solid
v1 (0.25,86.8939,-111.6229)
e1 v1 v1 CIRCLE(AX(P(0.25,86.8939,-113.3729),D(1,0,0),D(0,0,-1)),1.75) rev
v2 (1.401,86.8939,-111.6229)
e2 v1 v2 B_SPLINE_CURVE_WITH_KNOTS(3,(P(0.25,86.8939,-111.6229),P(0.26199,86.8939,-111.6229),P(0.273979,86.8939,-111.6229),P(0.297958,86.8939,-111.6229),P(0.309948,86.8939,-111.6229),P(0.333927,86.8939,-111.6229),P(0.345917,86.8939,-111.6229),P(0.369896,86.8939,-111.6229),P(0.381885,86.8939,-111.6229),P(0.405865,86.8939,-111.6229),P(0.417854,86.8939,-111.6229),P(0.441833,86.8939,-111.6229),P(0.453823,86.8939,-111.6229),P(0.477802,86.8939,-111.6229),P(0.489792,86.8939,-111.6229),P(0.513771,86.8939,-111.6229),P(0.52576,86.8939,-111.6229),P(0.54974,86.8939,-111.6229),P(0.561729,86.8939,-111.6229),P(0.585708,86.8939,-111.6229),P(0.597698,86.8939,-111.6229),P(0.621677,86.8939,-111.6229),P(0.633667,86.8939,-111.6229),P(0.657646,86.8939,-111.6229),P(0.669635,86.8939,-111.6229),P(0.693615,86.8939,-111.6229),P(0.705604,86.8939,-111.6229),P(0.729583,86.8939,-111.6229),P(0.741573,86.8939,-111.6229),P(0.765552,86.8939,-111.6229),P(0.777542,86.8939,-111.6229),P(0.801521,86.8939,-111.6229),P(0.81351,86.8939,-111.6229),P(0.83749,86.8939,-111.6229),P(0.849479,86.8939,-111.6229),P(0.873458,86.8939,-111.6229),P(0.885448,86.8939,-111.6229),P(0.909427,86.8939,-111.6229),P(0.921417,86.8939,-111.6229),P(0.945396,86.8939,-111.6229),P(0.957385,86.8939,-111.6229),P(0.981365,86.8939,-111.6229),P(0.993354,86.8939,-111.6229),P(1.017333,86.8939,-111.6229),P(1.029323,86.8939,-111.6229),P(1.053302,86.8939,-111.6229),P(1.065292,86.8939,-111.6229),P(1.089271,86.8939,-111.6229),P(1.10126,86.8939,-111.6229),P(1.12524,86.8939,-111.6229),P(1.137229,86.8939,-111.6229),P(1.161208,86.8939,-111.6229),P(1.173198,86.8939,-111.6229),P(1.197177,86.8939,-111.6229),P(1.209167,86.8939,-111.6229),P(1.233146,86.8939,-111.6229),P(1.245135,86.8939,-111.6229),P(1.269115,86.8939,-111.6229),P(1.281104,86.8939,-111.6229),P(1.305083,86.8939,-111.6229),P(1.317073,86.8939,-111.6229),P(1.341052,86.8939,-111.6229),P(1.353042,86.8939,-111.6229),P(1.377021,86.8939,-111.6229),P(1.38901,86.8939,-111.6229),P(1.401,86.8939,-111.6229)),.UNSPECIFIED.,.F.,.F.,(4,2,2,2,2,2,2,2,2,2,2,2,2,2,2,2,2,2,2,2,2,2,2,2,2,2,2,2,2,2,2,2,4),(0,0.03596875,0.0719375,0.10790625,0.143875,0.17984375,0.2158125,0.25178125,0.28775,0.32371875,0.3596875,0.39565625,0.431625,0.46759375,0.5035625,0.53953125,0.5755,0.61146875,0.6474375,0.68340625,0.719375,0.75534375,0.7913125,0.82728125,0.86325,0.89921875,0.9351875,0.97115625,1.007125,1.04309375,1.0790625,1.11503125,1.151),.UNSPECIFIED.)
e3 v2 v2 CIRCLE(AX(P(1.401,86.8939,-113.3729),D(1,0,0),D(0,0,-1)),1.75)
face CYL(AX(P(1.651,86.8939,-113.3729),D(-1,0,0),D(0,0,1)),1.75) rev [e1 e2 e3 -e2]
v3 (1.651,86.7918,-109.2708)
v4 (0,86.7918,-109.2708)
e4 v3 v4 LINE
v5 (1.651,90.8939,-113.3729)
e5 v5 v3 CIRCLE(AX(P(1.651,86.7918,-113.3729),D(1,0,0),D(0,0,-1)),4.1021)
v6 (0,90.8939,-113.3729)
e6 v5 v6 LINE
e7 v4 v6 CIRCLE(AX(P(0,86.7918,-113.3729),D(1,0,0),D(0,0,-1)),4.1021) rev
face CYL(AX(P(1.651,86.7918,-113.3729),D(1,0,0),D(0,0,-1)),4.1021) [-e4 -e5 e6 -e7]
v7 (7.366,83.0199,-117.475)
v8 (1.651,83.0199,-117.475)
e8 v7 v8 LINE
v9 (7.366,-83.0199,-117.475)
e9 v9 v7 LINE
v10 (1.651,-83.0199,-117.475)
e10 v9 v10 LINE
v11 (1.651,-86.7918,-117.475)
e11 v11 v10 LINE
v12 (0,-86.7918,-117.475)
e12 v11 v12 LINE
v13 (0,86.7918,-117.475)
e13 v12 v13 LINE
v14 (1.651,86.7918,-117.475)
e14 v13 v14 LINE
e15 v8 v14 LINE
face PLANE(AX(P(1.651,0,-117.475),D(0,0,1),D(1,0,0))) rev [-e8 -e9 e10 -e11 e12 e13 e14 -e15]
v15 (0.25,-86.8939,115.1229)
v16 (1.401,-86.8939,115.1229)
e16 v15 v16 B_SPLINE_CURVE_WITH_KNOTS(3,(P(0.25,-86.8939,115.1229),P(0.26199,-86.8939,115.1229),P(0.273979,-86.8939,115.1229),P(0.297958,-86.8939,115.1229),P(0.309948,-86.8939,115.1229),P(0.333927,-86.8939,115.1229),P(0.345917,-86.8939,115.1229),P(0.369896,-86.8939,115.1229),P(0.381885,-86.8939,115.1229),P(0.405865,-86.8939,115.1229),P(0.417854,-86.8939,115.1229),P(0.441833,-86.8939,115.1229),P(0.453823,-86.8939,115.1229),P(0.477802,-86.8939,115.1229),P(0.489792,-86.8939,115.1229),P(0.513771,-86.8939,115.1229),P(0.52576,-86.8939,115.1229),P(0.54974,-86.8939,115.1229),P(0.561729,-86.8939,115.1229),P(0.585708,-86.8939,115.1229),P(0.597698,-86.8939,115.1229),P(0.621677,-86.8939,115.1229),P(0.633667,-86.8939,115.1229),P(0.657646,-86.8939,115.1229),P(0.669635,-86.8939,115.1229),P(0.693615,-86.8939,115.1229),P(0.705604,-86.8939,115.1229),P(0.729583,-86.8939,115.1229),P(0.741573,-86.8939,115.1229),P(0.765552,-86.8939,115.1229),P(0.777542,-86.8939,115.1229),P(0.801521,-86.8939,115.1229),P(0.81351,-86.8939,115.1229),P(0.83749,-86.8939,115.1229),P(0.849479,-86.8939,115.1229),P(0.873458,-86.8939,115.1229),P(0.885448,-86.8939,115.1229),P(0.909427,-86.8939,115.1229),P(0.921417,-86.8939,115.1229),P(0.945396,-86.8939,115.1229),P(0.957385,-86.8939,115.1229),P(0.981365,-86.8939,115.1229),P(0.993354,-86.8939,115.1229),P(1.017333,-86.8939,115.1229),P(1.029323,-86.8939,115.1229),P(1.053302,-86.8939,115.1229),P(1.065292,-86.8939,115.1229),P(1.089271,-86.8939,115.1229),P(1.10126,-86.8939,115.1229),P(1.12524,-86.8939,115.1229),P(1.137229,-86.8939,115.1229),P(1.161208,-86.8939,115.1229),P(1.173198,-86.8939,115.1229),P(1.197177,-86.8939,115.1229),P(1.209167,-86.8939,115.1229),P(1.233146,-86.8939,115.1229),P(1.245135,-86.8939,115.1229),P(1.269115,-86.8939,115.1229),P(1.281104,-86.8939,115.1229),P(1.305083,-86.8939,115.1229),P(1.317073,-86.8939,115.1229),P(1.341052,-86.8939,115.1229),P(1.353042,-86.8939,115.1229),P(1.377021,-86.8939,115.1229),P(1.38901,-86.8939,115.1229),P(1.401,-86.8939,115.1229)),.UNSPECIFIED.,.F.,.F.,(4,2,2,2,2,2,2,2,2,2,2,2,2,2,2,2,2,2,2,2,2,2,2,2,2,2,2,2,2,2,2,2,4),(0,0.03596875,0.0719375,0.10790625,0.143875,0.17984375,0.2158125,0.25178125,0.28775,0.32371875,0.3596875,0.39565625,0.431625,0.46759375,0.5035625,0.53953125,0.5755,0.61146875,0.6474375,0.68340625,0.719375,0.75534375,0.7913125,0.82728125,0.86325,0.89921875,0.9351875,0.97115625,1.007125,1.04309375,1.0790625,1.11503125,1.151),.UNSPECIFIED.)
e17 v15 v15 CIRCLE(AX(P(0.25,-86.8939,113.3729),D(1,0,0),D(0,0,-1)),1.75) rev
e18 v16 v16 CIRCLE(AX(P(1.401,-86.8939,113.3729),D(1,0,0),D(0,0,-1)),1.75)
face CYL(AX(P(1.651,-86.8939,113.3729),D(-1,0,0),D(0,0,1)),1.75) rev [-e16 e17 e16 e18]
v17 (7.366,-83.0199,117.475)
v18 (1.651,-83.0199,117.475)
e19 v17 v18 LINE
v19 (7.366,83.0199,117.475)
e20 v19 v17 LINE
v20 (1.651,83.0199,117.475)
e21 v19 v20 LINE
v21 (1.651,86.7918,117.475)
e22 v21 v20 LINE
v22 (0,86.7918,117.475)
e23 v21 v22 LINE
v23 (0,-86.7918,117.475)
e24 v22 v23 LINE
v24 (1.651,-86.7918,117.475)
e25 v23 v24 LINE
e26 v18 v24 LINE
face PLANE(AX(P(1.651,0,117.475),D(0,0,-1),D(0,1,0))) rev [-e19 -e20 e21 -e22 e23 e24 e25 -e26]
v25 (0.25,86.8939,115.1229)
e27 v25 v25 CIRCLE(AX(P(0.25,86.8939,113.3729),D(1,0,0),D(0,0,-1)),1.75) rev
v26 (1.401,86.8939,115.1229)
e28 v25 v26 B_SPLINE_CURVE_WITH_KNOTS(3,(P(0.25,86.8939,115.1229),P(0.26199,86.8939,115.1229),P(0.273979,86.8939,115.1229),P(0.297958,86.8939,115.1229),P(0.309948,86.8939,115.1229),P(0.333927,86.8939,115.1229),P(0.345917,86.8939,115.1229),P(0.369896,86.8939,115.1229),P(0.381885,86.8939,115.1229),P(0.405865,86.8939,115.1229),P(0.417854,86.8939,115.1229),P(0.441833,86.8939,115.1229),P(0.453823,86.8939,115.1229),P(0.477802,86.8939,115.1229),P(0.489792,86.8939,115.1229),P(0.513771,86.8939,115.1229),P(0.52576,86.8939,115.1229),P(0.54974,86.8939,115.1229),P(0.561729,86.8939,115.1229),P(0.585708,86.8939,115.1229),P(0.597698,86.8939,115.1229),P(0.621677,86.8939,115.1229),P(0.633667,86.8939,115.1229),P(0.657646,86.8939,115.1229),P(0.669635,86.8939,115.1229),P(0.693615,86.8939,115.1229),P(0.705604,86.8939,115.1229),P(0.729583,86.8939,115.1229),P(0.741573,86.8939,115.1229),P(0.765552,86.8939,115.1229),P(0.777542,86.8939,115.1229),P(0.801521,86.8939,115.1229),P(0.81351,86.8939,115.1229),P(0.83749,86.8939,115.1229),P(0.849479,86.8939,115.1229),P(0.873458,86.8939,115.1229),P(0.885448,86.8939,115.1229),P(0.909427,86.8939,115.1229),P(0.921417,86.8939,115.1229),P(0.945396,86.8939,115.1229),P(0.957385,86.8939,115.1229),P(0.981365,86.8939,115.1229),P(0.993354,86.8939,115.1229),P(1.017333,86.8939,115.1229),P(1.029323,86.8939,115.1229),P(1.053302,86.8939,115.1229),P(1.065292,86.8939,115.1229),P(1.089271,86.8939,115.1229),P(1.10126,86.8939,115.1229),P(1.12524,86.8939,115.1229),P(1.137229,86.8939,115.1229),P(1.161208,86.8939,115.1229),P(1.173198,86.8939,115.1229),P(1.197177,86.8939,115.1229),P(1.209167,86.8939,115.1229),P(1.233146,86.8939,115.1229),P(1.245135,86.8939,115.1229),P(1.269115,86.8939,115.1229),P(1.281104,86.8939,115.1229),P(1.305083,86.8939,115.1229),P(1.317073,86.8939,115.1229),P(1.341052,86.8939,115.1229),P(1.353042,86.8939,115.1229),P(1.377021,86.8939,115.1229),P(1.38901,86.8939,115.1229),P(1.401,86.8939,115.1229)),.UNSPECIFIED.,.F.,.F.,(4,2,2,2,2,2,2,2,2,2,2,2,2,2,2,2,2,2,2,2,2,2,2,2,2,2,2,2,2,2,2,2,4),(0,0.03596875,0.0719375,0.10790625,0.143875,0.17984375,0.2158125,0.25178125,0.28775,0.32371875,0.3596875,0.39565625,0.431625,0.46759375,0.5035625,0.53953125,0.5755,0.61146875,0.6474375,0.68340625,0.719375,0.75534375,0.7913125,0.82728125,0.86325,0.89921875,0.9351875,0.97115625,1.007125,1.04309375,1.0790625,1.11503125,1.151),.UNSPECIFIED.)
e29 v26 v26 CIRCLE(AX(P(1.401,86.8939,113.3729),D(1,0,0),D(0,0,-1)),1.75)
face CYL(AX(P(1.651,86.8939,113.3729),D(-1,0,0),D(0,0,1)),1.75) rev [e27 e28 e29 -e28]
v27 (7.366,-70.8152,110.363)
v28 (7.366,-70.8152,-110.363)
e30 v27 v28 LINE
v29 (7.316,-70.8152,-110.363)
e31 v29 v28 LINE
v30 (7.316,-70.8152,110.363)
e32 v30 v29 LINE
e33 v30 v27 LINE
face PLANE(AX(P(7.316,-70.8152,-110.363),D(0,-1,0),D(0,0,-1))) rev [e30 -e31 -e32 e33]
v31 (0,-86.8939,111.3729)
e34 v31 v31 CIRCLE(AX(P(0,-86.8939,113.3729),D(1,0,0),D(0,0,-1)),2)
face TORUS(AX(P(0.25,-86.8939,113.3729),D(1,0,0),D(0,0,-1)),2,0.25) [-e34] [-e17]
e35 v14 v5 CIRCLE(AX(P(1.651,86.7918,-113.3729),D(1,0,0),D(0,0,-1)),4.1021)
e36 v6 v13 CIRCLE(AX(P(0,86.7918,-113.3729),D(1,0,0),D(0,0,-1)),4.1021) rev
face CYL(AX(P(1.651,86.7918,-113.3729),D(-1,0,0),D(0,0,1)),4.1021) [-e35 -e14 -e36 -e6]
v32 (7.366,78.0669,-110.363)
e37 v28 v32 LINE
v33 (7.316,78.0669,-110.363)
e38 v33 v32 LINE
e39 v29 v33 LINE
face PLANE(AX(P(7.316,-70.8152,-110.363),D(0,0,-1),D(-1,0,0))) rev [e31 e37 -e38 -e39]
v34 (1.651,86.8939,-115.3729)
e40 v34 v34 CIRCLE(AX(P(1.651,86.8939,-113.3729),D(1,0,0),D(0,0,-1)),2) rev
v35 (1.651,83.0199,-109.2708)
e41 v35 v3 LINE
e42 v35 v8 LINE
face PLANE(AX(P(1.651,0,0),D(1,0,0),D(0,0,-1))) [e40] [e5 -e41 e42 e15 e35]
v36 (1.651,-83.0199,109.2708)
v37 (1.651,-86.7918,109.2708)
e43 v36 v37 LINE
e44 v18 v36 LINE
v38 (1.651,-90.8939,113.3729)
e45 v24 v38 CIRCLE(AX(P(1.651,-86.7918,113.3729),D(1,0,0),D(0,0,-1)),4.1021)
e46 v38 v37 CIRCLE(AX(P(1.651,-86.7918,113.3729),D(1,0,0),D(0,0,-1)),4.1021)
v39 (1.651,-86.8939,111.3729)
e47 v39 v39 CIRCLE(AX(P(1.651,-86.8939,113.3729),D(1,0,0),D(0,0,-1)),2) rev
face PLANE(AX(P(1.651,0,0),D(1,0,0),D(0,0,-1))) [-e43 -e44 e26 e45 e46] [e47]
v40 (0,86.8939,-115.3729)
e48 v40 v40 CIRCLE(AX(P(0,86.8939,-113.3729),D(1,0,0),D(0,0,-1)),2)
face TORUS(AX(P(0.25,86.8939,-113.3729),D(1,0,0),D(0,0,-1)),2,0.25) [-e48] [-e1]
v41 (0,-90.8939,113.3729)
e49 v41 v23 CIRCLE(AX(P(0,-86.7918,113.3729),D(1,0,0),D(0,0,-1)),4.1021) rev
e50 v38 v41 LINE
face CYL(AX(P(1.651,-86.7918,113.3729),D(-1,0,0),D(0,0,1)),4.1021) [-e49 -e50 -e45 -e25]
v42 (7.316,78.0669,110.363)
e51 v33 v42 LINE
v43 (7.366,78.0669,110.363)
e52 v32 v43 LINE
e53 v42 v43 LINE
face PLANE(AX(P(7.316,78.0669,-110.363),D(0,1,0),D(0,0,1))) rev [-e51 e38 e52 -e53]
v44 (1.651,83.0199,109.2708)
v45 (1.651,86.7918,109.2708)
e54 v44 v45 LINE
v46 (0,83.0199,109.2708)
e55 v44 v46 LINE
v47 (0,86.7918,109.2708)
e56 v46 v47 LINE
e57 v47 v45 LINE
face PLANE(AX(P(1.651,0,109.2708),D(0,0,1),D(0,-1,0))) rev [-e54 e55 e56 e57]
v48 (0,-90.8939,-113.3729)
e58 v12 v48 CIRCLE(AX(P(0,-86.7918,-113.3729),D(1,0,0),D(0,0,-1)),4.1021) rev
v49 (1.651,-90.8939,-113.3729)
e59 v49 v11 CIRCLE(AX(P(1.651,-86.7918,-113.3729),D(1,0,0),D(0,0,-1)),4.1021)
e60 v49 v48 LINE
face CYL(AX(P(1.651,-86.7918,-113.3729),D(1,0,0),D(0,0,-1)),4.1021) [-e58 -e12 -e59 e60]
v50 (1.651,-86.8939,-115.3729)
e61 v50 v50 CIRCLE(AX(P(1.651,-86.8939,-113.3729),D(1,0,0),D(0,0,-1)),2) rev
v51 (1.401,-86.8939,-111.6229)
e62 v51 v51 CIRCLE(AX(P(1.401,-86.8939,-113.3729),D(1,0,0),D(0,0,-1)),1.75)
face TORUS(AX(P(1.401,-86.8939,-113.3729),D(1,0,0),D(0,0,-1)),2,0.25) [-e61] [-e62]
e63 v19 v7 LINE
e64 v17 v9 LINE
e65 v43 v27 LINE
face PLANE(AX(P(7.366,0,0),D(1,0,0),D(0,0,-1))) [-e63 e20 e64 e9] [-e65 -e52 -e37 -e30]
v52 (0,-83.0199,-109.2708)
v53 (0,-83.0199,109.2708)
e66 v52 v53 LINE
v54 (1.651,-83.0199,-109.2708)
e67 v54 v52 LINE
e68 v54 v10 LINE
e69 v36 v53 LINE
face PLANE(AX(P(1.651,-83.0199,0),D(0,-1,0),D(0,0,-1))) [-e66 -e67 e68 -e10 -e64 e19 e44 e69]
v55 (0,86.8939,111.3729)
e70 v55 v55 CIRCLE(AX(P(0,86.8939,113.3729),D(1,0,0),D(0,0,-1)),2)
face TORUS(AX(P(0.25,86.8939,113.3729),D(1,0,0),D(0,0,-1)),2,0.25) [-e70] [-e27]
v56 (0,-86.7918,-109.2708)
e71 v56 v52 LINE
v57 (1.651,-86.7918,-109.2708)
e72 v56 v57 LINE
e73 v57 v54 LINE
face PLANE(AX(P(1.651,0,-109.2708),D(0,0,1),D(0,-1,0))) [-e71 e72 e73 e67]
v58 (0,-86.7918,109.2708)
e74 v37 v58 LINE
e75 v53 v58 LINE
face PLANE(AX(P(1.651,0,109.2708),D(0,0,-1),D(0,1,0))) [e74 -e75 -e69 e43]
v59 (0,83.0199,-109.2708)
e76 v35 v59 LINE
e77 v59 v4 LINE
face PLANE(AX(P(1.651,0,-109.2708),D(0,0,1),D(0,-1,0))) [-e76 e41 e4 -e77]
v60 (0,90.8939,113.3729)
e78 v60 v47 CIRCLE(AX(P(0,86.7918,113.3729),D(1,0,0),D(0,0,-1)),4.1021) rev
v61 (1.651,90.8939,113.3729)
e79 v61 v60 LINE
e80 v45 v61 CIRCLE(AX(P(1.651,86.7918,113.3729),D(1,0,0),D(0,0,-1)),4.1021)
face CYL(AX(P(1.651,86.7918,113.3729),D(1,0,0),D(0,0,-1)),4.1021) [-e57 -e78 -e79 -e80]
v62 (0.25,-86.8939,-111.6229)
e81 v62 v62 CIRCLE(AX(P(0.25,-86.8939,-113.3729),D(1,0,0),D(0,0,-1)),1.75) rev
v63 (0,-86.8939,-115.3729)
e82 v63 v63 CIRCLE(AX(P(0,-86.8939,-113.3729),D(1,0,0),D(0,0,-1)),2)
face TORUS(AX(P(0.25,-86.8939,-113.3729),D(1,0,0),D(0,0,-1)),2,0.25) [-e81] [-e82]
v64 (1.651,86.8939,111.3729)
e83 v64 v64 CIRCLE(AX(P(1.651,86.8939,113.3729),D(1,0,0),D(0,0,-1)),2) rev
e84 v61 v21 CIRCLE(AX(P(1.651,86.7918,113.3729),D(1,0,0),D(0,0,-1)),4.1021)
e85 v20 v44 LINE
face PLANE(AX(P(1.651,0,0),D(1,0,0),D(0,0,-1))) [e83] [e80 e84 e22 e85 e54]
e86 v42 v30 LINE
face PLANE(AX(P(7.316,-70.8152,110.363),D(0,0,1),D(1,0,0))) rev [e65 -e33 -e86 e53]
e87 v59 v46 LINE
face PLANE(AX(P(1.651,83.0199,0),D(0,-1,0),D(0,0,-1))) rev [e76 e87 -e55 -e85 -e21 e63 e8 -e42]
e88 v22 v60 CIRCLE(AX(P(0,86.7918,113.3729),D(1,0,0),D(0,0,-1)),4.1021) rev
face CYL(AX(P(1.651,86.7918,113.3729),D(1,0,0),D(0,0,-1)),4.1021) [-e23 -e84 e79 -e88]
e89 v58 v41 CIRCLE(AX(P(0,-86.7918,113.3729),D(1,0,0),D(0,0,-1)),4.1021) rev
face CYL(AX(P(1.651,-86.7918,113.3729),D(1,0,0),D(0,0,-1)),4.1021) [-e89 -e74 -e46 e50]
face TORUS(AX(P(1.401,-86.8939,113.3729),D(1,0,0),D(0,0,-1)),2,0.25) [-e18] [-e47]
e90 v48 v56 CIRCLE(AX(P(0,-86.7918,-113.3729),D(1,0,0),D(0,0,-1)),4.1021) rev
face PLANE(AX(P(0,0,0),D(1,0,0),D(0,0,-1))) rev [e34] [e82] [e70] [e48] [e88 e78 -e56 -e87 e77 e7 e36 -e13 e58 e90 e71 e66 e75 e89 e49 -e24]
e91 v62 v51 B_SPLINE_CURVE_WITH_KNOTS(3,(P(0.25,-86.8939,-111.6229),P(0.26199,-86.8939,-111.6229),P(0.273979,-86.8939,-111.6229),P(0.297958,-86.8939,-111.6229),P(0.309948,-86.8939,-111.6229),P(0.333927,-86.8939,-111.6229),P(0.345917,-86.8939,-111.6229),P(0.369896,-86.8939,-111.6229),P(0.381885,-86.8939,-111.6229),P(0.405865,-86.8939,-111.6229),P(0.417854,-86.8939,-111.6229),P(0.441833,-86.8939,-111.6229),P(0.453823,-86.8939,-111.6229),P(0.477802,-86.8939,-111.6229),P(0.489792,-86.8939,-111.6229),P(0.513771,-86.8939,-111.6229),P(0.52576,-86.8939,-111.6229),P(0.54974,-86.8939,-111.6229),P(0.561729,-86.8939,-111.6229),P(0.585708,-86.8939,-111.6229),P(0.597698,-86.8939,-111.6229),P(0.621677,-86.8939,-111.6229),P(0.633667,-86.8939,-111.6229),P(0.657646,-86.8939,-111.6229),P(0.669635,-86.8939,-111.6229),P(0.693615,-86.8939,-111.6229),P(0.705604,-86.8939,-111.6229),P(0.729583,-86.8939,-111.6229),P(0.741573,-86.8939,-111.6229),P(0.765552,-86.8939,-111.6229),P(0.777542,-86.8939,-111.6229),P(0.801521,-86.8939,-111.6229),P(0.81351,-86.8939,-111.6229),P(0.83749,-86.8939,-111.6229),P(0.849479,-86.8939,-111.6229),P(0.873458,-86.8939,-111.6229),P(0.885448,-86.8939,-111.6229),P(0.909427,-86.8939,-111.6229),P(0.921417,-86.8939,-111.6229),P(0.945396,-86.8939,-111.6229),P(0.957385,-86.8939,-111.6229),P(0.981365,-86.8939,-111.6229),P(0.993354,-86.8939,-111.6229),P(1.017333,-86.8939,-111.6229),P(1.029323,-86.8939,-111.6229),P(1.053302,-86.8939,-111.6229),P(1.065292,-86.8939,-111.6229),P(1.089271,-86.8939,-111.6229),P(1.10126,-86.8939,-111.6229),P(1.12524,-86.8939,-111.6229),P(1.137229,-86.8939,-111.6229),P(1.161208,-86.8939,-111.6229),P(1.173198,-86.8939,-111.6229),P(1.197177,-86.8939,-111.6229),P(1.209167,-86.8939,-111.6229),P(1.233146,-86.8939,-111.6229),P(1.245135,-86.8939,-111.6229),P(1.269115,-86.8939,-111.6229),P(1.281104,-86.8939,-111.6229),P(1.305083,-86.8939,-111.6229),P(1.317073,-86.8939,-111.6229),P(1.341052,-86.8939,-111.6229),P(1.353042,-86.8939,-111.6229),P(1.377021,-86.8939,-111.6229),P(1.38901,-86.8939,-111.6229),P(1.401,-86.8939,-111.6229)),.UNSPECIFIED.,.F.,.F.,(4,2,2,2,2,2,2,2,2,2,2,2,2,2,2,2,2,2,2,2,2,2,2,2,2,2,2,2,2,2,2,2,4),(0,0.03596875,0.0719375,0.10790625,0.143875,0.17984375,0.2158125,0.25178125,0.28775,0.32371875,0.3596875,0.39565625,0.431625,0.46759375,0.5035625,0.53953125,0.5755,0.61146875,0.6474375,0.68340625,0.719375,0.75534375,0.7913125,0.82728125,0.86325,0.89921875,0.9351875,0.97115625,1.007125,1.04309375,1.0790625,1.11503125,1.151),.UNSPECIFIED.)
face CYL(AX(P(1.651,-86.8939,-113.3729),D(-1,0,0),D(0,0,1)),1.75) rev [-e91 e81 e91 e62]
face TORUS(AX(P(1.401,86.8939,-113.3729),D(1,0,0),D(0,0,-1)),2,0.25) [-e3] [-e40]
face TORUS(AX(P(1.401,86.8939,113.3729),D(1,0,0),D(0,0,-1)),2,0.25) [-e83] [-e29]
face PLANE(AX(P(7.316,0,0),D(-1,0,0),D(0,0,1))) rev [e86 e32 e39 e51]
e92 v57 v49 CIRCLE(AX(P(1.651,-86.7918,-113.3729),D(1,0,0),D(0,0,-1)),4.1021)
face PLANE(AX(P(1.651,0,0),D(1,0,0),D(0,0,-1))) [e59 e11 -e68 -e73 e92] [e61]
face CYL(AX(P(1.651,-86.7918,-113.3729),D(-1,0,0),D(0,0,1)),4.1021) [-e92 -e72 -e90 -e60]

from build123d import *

# Parameters (mm, degrees)
SKETCH1_W           = 7.874
SKETCH1_H           = 8.2042
SKETCH1_R           = 1.75
SKETCH1_W_2         = 166.0398
SKETCH1_H_2         = 234.95
BOSS_EXTRUDE1_DEPTH = 1.651
BOSS_EXTRUDE2_DEPTH = 5.715
SKETCH3_W           = 148.8821
SKETCH3_H           = 220.726
CUT_EXTRUDE1_DEPTH  = 0.05
FILLET1_R           = 4.1021
FILLET2_R           = 0.25


with BuildPart() as part:
    # Sketch1 → Boss-Extrude1 (new body)
    # profile 1 of 5: a face of its own
    with BuildSketch(Plane.YZ):
        with Locations((-86.9569, 113.3729)):
            Rectangle(SKETCH1_W, SKETCH1_H)
        with Locations(Location((-86.8939, 113.3729, 0), (0, 0, 90))):
            Circle(SKETCH1_R, mode=Mode.SUBTRACT)
    # profile 2 of 5: a face of its own
    with BuildSketch(Plane.YZ):
        Rectangle(SKETCH1_W_2, SKETCH1_H_2)
    # profile 3 of 5: a face of its own
    with BuildSketch(Plane.YZ):
        with Locations((86.9569, 113.3729)):
            Rectangle(SKETCH1_W, SKETCH1_H)
        with Locations(Location((86.8939, 113.3729, 0), (0, 0, 90))):
            Circle(SKETCH1_R, mode=Mode.SUBTRACT)
    # profile 4 of 5: a face of its own
    with BuildSketch(Plane.YZ):
        with Locations((86.9569, -113.3729)):
            Rectangle(SKETCH1_W, SKETCH1_H)
        with Locations(Location((86.8939, -113.3729, 0), (0, 0, 90))):
            Circle(SKETCH1_R, mode=Mode.SUBTRACT)
    # profile 5 of 5: a face of its own
    with BuildSketch(Plane.YZ):
        with Locations((-86.9569, -113.3729)):
            Rectangle(SKETCH1_W, SKETCH1_H)
        with Locations(Location((-86.8939, -113.3729, 0), (0, 0, 90))):
            Circle(SKETCH1_R, mode=Mode.SUBTRACT)
    extrude(amount=BOSS_EXTRUDE1_DEPTH)

    # Sketch2 → Boss-Extrude2 (add)
    with BuildSketch(Plane.YZ.offset(1.651)):
        Polygon((83.0199, 117.475), (-83.0199, 117.475), (-83.0199, 109.2708), (-83.0199, -109.2708), (-83.0199, -117.475), (83.0199, -117.475), (83.0199, -109.2708), (83.0199, 109.2708), align=None)
    extrude(amount=BOSS_EXTRUDE2_DEPTH)

    # Sketch3 → Cut-Extrude1 (cut)
    with BuildSketch(Plane.YZ.offset(7.366)):
        with Locations((3.62585, 0)):
            Rectangle(SKETCH3_W, SKETCH3_H)
    extrude(amount=-CUT_EXTRUDE1_DEPTH, mode=Mode.SUBTRACT)

    # Fillet1
    fillet1_edges = [part.edges().sort_by_distance(p)[0] for p in [
        (0.8255, -90.8939, -117.475),
        (0.8255, -90.8939, -109.2708),
        (0.8255, -90.8939, 109.2708),
        (0.8255, -90.8939, 117.475),
        (0.8255, 90.8939, 117.475),
        (0.8255, 90.8939, 109.2708),
        (0.8255, 90.8939, -109.2708),
        (0.8255, 90.8939, -117.475),
    ]]
    fillet(fillet1_edges, radius=FILLET1_R - 0.0001)  # a hair under: the kernel refuses the full size

    # Fillet2
    fillet2_edges = [part.edges().sort_by_distance(p)[0] for p in [
        (1.651, 86.8939, -115.1229),
        (0, 86.8939, -115.1229),
        (0, 86.8939, 111.6229),
        (0, -86.8939, -115.1229),
        (0, -86.8939, 111.6229),
        (1.651, -86.8939, 111.6229),
        (1.651, -86.8939, -115.1229),
        (1.651, 86.8939, 111.6229),
    ]]
    fillet(fillet2_edges, radius=FILLET2_R)


solid = part.part
